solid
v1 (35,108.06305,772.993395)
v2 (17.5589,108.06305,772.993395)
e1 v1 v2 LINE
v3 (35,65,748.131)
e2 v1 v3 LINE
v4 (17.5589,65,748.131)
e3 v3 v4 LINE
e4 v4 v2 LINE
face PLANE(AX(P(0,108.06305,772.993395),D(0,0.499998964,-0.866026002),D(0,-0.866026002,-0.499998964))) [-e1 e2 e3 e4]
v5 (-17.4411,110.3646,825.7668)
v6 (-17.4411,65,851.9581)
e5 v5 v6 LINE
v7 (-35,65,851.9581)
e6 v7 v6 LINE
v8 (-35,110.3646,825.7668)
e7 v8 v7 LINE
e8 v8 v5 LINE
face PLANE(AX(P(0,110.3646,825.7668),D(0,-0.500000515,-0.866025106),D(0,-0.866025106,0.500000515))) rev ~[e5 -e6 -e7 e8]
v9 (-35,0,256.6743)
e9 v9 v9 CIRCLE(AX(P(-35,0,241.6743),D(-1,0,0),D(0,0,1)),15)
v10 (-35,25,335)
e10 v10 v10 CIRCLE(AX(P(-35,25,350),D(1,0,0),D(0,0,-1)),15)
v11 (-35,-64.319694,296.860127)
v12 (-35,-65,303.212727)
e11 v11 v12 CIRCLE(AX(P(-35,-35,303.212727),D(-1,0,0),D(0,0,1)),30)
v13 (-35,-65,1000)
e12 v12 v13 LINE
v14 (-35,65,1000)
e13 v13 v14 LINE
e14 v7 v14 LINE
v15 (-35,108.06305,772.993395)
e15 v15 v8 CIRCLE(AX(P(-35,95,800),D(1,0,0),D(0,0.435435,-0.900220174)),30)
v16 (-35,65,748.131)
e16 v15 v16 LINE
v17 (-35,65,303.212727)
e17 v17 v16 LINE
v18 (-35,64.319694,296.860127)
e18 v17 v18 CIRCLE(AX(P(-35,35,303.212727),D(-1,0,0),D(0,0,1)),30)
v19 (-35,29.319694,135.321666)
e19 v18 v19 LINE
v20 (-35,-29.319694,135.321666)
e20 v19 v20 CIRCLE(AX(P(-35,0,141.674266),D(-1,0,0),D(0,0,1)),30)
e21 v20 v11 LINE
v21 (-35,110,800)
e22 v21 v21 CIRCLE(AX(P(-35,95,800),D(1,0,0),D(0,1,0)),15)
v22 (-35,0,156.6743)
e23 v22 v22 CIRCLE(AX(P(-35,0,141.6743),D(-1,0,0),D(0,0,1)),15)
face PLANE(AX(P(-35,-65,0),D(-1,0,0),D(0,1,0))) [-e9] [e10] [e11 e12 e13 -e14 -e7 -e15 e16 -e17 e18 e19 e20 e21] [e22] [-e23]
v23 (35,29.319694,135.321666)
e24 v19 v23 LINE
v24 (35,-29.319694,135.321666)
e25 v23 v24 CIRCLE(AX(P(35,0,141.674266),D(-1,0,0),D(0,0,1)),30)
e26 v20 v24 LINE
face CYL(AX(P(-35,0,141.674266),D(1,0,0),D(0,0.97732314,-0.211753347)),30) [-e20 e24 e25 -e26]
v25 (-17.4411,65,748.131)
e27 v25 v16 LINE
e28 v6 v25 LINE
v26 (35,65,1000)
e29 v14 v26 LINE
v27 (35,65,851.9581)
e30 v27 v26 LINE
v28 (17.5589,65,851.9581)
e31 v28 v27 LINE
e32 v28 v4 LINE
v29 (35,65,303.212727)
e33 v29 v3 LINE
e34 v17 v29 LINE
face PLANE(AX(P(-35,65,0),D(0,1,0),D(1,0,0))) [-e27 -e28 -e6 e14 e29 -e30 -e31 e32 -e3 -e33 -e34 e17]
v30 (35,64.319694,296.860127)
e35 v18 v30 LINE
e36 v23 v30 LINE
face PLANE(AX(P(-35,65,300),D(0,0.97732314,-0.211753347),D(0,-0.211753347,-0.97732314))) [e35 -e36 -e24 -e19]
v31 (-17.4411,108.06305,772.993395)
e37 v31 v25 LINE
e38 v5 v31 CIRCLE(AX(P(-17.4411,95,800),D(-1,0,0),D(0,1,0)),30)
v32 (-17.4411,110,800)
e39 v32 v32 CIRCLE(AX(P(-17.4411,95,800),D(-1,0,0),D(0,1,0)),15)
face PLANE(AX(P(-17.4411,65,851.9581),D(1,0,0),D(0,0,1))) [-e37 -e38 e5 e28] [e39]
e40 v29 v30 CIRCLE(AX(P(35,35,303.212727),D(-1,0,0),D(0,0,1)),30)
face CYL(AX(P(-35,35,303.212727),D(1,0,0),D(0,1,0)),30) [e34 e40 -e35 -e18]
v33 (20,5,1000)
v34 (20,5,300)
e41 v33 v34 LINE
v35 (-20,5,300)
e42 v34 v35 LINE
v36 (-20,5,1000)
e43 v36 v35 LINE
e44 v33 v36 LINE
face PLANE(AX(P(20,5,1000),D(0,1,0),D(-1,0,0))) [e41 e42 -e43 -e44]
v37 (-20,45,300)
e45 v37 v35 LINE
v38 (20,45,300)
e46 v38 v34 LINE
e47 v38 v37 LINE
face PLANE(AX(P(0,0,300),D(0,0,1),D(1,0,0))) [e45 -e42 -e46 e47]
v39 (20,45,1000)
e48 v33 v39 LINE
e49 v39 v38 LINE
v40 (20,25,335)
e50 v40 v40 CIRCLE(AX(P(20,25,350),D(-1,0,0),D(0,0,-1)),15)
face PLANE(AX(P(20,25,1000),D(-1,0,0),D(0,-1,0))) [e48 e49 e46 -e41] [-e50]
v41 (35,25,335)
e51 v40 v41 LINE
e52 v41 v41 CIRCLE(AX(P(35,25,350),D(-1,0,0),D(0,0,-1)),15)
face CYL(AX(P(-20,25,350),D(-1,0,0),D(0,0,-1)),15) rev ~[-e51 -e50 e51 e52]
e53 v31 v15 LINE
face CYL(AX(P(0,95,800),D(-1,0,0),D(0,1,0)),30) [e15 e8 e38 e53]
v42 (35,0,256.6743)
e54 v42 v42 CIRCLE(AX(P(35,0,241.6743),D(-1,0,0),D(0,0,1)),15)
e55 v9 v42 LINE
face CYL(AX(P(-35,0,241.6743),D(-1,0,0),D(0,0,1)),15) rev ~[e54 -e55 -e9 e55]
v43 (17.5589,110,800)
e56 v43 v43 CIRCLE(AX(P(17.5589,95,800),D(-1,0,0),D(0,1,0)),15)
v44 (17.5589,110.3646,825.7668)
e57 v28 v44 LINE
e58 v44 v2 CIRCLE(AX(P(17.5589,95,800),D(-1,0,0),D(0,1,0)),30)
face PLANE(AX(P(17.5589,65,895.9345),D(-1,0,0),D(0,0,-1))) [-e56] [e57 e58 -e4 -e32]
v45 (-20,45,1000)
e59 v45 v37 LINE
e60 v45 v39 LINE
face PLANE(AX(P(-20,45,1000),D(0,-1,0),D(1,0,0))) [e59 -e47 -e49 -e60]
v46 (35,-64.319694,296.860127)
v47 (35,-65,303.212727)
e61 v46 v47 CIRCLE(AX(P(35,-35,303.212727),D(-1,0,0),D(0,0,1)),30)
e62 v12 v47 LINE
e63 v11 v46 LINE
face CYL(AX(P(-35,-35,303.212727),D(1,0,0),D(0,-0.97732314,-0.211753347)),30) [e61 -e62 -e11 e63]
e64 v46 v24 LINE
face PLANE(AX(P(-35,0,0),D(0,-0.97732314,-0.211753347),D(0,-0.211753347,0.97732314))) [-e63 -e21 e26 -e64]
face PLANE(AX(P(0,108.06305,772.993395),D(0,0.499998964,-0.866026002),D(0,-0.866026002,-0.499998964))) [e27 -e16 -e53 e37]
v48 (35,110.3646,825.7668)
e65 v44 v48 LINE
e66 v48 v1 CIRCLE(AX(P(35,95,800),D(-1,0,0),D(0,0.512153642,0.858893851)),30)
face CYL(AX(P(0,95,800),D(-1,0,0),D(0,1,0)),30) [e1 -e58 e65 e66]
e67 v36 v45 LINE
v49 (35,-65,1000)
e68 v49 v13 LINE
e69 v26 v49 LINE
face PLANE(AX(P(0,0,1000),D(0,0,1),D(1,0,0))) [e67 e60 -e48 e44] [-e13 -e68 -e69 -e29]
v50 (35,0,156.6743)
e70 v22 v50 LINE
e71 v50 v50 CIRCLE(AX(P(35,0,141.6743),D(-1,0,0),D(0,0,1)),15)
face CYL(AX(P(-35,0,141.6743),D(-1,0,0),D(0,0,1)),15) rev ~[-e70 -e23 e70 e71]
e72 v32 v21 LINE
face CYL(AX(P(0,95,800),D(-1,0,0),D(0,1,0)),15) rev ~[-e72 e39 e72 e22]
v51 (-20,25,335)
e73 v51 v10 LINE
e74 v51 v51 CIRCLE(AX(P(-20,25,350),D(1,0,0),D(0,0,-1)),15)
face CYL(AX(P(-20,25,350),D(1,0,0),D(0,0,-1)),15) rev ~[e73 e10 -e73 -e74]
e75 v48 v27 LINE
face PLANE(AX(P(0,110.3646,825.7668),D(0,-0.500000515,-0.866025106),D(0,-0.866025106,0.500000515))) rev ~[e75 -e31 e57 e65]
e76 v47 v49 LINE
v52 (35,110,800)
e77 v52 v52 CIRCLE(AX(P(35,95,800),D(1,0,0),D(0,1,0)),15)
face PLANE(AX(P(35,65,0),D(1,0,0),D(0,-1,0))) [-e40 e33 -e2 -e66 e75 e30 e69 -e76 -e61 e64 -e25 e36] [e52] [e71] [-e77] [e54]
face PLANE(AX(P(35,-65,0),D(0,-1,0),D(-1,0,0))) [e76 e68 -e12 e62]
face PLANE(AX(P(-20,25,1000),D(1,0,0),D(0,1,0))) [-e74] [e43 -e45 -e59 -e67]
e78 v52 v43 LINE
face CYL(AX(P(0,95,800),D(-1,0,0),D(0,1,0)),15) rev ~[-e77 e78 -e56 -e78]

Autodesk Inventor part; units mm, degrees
ref_plane "YZ Plane" through (0, 0, 0) normal (1, 0, 0) x (0, 1, 0)
ref_plane "XZ Plane" through (0, 0, 0) normal (0, 1, 0) x (-1, 0, 0)
ref_plane "XY Plane" through (0, 0, 0) normal (0, 0, 1) x (1, 0, 0)
sketch "草图1" plane through (0, 0, 0) normal (0, 0, 1) x (1, 0, 0)
  line L0 (-35, 65) -> (35, 65)
  line L1 (35, 65) -> (35, -65)
  line L2 (35, -65) -> (-35, -65)
  line L3 (-35, -65) -> (-35, 65)
  line L4 (-35, 65) -> (35, -65) construction
  line L5 (35, 65) -> (-35, -65) construction
  point P0 (0, 0)
  dimension "d0" = 70
  dimension "d1" = 130
extrude "拉伸1" add sketch "草图1" along normal blind 1000
sketch "草图2" plane through (-35, -65, 0) normal (-1, 0, 0) x (0, 0, 1)
  line L0 (0, 65) -> (300, 0)
  line L1 (0, 0) -> (1000, 0) projected
  line L2 (0, 130) -> (1000, 130) projected
  line L3 (300, 130) -> (0, 65)
  line L4 (300, 0) -> (300, 130)
  line L5 (0, 0) -> (0, 130) projected
  dimension "d4" = 300
extrude "拉伸2" cut sketch "草图2" against normal through all contours L5 L2 L3 | L0 L1 L5
fillet "圆角1" radius 30 3 edges at (0, 0, 0) (0, 65, 300) (0, -65, 300)
sketch "草图3" plane through (-35, -65, 1000) normal (-1, 0, 0) x (0, 0, 1)
  arc A0 (-864.6783, 94.3197) -> (-864.6783, 35.6803) centre (-858.3257, 65) ccw projected
  circle A1 centre (-858.3257, 65) radius 15
  circle A2 centre (-758.3257, 65) radius 15
  point P0 (-1000, 65)
  dimension "d8" = 30
  dimension "d11" = 30
  dimension "d12" = 100
extrude "拉伸3" cut sketch "草图3" against normal through all
sketch "草图4" plane through (0, 0, 1000) normal (0, 0, 1) x (1, 0, 0)
  line L0 (-53.3891, 25) -> (64.6192, 25)
  line L1 (0, 81.4777) -> (0, 16.0102)
  line L2 (-20, 45) -> (20, 45)
  line L3 (20, 45) -> (20, 5)
  line L4 (20, 5) -> (-20, 5)
  line L5 (-20, 5) -> (-20, 45)
  line L6 (-20, 45) -> (20, 5) construction
  line L7 (20, 45) -> (-20, 5) construction
  line L8 (35, 65) -> (-35, 65) projected
  point P0 (0, 0)
  point P1 (0, 25)
  dimension "d13" = 40
  dimension "d14" = 40
  dimension "d15" = 40
extrude "拉伸4" cut sketch "草图4" against normal blind 700
sketch "草图5" plane through (-20, 5, 1000) normal (1, 0, 0) x (0, 0, -1)
  line L0 (-16.4327, 20) -> (719.4245, 20)
  line L1 (696.7873, 60) -> (0, 60) projected
  circle A0 centre (650, 20) radius 15
  line L2 (0, -70) -> (0, 60) projected
  point P0 (1000, -5)
  dimension "d18" = 40
  dimension "d19" = 30
  dimension "d20" = 650
extrude "拉伸5" cut sketch "草图5" along normal mid plane 700
sketch "草图6" plane through (0, 0, 0) normal (1, 0, 0) x (0, 1, 0)
  circle A0 centre (95, 800) radius 15
  line L0 (65, 303.2127) -> (65, 1000) projected
  line L1 (-65, 1000) -> (65, 1000) projected
  line L2 (95.8043, 829.9892) -> (131.374, 829.9892) construction
  line L3 (109.6775, 773.8357) -> (183.0515, 773.8357) construction
  line L4 (65, 847.7741) -> (65, 745.182)
  circle A1 centre (95, 800) radius 30
  line L5 (110.3646, 825.7668) -> (65, 851.9581)
  line L6 (110.3646, 825.7668) -> (162.747, 825.7668) construction
  line L7 (65, 851.9581) -> (65, 745.182)
  line L8 (65, 303.2127) -> (65, 1000) projected
  line L9 (111.8573, 775.184) -> (65, 748.131)
  line L10 (111.8573, 775.184) -> (168.7185, 775.184) construction
  point P0 (0, 0)
  dimension "d23" = 30
  dimension "d25" = 30
  dimension "d26" = 200
  dimension "d29" = 60
  dimension "d30" = 150
  dimension "d31" = 150
extrude "拉伸6" add sketch "草图6" along normal mid plane 70
sketch "草图7" plane through (-35, 65, 1000) normal (0, 1, 0) x (1, 0, 0)
  line L0 (70, 148.0419) -> (0, 148.0419) projected
  line L1 (35, 148.0419) -> (35, 251.869)
  line L2 (0, 251.869) -> (70, 251.869) projected
  line L3 (0, 185) -> (0, 215) projected
  line L4 (0, 200) -> (70.1178, 200)
  line L5 (17.5589, 104.0655) -> (52.5589, 104.0655)
  line L6 (52.5589, 104.0655) -> (52.5589, 295.9345)
  line L7 (52.5589, 295.9345) -> (17.5589, 295.9345)
  line L8 (17.5589, 295.9345) -> (17.5589, 104.0655)
  line L9 (17.5589, 104.0655) -> (52.5589, 295.9345) construction
  line L10 (52.5589, 104.0655) -> (17.5589, 295.9345) construction
  point P0 (35, 1000)
  point P1 (35.0589, 200)
  dimension "d35" = 35
extrude "拉伸7" cut sketch "草图7" along normal blind 70
properties part number "DipperSon" material "钢，高强度，低合金"
